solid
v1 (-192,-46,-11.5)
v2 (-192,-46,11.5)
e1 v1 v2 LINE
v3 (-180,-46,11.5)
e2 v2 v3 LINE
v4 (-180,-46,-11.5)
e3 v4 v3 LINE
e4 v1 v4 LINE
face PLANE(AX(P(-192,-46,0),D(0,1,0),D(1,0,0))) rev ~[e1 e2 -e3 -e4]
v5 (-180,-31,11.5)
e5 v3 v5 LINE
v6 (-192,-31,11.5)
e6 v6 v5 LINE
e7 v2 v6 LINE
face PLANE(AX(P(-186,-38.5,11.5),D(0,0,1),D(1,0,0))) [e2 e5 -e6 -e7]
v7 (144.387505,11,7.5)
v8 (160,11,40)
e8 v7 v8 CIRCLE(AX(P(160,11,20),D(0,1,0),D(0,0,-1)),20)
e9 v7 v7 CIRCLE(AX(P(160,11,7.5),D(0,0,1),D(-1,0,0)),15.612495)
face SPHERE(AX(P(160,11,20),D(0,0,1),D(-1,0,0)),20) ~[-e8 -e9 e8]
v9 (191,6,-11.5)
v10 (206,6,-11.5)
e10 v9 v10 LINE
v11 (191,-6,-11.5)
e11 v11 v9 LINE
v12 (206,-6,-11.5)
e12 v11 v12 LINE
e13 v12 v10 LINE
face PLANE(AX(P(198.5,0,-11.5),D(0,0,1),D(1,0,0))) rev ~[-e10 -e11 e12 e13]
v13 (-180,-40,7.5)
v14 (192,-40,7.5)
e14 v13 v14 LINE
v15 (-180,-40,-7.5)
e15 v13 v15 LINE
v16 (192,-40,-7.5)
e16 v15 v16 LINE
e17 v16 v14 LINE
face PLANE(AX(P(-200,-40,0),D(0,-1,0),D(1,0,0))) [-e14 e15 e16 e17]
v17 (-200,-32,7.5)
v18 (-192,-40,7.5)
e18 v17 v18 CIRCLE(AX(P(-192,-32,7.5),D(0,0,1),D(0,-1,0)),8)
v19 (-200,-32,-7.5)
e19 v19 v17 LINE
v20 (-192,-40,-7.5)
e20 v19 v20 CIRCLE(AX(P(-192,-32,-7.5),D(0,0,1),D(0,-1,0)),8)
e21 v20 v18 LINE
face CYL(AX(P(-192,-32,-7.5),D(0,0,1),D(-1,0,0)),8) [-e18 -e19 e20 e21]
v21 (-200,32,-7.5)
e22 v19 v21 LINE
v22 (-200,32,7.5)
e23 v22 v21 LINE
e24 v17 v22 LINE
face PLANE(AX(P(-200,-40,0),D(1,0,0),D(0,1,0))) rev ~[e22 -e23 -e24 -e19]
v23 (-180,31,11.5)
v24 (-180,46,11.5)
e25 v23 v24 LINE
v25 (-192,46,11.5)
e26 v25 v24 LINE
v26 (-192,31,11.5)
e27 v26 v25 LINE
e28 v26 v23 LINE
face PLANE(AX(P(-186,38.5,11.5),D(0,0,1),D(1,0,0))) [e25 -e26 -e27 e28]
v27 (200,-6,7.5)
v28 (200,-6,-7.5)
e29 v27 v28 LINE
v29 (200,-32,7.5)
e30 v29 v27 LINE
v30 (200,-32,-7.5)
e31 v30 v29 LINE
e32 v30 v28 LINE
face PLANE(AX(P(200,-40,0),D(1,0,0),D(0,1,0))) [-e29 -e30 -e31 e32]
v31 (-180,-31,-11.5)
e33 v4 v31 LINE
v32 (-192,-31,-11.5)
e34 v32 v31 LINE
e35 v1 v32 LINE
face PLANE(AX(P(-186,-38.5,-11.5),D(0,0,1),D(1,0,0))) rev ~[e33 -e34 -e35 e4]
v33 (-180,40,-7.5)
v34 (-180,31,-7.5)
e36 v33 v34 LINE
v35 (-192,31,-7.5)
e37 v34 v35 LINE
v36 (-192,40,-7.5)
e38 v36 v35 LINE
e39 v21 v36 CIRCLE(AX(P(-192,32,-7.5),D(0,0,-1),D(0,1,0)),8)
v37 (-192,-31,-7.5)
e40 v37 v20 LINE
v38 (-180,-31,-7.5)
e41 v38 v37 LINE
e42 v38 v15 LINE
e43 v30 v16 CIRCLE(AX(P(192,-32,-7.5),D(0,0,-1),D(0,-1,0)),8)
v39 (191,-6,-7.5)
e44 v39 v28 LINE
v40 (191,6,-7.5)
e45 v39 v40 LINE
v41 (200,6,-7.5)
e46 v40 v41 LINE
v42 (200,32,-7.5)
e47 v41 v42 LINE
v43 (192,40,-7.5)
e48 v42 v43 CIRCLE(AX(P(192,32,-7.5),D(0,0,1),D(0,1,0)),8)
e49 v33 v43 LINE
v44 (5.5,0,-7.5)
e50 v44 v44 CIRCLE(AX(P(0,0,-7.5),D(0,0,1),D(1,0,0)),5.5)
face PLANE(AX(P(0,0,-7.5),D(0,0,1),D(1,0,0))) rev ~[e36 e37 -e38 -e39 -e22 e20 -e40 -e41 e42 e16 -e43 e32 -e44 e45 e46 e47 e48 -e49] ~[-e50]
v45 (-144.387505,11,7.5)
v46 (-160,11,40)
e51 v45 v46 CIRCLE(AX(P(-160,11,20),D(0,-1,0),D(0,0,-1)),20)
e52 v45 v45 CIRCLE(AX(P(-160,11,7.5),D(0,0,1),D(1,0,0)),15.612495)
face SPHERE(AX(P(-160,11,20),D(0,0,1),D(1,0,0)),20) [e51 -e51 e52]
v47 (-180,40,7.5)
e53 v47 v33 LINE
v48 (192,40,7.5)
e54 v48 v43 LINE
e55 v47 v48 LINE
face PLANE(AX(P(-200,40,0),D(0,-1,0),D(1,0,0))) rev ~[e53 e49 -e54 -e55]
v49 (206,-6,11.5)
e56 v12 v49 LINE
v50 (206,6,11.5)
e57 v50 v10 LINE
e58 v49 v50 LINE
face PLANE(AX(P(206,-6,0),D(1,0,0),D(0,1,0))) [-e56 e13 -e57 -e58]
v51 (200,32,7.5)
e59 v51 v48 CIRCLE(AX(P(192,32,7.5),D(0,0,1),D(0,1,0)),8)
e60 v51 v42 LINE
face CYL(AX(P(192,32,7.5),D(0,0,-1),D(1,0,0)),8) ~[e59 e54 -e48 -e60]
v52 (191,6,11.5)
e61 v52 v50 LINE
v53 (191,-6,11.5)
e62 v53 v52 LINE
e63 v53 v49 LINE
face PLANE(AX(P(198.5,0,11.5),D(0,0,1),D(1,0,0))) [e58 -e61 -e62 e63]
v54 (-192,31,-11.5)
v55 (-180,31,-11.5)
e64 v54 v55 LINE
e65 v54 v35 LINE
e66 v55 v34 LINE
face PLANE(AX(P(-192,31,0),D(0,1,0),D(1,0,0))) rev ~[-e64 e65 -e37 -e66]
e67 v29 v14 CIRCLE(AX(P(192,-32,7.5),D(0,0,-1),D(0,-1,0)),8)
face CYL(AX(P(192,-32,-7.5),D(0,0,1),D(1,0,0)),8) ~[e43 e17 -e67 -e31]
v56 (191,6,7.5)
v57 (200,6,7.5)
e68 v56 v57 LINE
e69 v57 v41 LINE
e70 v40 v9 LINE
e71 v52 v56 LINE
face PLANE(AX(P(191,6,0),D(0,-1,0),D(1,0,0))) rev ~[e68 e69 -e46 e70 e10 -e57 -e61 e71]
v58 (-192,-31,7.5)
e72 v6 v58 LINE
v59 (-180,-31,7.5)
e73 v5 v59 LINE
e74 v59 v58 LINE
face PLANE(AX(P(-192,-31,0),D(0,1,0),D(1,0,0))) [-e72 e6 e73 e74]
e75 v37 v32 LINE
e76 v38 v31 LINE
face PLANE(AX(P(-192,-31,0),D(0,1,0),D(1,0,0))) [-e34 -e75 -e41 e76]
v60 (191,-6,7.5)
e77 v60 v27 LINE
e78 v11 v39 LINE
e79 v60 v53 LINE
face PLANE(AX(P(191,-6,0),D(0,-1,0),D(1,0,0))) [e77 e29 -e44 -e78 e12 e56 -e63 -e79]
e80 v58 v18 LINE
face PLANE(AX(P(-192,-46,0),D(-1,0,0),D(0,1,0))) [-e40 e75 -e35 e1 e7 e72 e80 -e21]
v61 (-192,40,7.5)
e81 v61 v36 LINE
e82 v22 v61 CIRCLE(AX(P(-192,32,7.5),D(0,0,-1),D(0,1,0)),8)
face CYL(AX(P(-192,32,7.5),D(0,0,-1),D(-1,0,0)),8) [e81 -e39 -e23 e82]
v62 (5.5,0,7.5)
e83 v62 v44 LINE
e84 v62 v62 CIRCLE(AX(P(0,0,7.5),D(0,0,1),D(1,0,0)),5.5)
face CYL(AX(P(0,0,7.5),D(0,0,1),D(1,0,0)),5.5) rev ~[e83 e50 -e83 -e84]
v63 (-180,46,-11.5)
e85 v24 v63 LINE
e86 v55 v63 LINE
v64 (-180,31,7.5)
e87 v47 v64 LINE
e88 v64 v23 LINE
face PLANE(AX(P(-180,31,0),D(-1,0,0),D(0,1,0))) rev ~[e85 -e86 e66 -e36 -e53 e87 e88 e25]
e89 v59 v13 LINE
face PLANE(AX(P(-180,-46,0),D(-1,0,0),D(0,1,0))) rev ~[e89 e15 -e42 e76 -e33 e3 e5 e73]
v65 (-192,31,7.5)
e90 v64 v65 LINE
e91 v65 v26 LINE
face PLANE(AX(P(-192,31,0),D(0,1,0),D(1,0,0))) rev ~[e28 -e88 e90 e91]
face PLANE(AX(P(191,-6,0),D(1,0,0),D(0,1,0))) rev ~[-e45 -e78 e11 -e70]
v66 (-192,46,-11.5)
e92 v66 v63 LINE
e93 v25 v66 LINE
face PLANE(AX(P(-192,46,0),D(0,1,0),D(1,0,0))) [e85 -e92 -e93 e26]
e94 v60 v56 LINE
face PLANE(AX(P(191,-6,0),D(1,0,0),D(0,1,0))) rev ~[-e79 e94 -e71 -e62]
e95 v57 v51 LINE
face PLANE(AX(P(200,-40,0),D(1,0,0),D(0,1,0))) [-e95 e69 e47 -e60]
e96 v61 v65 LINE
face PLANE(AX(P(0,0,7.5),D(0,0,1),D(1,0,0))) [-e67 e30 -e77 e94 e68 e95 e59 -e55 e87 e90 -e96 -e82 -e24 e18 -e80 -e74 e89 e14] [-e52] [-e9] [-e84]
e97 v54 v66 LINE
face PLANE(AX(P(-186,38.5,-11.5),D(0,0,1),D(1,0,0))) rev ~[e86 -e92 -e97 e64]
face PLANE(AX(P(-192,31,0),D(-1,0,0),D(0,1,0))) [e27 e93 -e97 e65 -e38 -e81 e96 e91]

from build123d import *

# Parameters (mm, degrees)
F0_W     = 400
F0_H     = 80
F1_DEPTH = 7.5
F2_R     = 8
F3_W     = 12
F3_H     = 15
F3_W_2   = 15
F3_H_2   = 12
F4_DEPTH = 11.5
F5_R     = 5.5
F6_DEPTH = 25


# Not quite as in the source:
# - a pattern or mirror of a feature is missing from the dataset's text; its kind, count and spacing are read off the source's solid


with BuildPart() as f1:
    # F0 (on Top) → F1 (new body, symmetric)
    with BuildSketch(Plane.XY):
        Rectangle(F0_W, F0_H)
    extrude(amount=F1_DEPTH, both=True)

    # F2
    f2_edges = [f1.edges().sort_by_distance(p)[0] for p in [
        (-200, -40, 0),
        (200, -40, 0),
        (200, 40, 0),
        (-200, 40, 0),
    ]]
    fillet(f2_edges, radius=F2_R)

    # F3 (on Top) → F4 (join, symmetric)
    with BuildSketch(Plane.XY):
        with Locations((-186, -38.5)):
            Rectangle(F3_W, F3_H)
        with Locations((-186, 38.5)):
            Rectangle(F3_W, F3_H)
        with Locations((198.5, 0)):
            Rectangle(F3_W_2, F3_H_2)
    extrude(amount=F4_DEPTH, both=True)

    # F5 (on face) → F6 (cut)
    with BuildSketch(Plane.XY.offset(7.5)):
        Circle(F5_R)
    extrude(amount=-F6_DEPTH, mode=Mode.SUBTRACT)

    # F10 (on plane+point) → F11 (revolve)
    with BuildSketch(Plane.XZ.offset(-11)):
        with BuildLine():
            Line((-160, 40), (-160, 0))
            ThreePointArc((-160, 0), (-140, 20), (-160, 40))
        make_face()
    f11 = revolve(axis=Axis((-160, 11, 20), (0, 0, 1)))

    # F11_copies: F11 across plane
    add(f11.mirror(Plane(origin=(0, 0, 0), x_dir=(0, 0, 1), z_dir=(1, 0, 0))))


solid = f1.part
